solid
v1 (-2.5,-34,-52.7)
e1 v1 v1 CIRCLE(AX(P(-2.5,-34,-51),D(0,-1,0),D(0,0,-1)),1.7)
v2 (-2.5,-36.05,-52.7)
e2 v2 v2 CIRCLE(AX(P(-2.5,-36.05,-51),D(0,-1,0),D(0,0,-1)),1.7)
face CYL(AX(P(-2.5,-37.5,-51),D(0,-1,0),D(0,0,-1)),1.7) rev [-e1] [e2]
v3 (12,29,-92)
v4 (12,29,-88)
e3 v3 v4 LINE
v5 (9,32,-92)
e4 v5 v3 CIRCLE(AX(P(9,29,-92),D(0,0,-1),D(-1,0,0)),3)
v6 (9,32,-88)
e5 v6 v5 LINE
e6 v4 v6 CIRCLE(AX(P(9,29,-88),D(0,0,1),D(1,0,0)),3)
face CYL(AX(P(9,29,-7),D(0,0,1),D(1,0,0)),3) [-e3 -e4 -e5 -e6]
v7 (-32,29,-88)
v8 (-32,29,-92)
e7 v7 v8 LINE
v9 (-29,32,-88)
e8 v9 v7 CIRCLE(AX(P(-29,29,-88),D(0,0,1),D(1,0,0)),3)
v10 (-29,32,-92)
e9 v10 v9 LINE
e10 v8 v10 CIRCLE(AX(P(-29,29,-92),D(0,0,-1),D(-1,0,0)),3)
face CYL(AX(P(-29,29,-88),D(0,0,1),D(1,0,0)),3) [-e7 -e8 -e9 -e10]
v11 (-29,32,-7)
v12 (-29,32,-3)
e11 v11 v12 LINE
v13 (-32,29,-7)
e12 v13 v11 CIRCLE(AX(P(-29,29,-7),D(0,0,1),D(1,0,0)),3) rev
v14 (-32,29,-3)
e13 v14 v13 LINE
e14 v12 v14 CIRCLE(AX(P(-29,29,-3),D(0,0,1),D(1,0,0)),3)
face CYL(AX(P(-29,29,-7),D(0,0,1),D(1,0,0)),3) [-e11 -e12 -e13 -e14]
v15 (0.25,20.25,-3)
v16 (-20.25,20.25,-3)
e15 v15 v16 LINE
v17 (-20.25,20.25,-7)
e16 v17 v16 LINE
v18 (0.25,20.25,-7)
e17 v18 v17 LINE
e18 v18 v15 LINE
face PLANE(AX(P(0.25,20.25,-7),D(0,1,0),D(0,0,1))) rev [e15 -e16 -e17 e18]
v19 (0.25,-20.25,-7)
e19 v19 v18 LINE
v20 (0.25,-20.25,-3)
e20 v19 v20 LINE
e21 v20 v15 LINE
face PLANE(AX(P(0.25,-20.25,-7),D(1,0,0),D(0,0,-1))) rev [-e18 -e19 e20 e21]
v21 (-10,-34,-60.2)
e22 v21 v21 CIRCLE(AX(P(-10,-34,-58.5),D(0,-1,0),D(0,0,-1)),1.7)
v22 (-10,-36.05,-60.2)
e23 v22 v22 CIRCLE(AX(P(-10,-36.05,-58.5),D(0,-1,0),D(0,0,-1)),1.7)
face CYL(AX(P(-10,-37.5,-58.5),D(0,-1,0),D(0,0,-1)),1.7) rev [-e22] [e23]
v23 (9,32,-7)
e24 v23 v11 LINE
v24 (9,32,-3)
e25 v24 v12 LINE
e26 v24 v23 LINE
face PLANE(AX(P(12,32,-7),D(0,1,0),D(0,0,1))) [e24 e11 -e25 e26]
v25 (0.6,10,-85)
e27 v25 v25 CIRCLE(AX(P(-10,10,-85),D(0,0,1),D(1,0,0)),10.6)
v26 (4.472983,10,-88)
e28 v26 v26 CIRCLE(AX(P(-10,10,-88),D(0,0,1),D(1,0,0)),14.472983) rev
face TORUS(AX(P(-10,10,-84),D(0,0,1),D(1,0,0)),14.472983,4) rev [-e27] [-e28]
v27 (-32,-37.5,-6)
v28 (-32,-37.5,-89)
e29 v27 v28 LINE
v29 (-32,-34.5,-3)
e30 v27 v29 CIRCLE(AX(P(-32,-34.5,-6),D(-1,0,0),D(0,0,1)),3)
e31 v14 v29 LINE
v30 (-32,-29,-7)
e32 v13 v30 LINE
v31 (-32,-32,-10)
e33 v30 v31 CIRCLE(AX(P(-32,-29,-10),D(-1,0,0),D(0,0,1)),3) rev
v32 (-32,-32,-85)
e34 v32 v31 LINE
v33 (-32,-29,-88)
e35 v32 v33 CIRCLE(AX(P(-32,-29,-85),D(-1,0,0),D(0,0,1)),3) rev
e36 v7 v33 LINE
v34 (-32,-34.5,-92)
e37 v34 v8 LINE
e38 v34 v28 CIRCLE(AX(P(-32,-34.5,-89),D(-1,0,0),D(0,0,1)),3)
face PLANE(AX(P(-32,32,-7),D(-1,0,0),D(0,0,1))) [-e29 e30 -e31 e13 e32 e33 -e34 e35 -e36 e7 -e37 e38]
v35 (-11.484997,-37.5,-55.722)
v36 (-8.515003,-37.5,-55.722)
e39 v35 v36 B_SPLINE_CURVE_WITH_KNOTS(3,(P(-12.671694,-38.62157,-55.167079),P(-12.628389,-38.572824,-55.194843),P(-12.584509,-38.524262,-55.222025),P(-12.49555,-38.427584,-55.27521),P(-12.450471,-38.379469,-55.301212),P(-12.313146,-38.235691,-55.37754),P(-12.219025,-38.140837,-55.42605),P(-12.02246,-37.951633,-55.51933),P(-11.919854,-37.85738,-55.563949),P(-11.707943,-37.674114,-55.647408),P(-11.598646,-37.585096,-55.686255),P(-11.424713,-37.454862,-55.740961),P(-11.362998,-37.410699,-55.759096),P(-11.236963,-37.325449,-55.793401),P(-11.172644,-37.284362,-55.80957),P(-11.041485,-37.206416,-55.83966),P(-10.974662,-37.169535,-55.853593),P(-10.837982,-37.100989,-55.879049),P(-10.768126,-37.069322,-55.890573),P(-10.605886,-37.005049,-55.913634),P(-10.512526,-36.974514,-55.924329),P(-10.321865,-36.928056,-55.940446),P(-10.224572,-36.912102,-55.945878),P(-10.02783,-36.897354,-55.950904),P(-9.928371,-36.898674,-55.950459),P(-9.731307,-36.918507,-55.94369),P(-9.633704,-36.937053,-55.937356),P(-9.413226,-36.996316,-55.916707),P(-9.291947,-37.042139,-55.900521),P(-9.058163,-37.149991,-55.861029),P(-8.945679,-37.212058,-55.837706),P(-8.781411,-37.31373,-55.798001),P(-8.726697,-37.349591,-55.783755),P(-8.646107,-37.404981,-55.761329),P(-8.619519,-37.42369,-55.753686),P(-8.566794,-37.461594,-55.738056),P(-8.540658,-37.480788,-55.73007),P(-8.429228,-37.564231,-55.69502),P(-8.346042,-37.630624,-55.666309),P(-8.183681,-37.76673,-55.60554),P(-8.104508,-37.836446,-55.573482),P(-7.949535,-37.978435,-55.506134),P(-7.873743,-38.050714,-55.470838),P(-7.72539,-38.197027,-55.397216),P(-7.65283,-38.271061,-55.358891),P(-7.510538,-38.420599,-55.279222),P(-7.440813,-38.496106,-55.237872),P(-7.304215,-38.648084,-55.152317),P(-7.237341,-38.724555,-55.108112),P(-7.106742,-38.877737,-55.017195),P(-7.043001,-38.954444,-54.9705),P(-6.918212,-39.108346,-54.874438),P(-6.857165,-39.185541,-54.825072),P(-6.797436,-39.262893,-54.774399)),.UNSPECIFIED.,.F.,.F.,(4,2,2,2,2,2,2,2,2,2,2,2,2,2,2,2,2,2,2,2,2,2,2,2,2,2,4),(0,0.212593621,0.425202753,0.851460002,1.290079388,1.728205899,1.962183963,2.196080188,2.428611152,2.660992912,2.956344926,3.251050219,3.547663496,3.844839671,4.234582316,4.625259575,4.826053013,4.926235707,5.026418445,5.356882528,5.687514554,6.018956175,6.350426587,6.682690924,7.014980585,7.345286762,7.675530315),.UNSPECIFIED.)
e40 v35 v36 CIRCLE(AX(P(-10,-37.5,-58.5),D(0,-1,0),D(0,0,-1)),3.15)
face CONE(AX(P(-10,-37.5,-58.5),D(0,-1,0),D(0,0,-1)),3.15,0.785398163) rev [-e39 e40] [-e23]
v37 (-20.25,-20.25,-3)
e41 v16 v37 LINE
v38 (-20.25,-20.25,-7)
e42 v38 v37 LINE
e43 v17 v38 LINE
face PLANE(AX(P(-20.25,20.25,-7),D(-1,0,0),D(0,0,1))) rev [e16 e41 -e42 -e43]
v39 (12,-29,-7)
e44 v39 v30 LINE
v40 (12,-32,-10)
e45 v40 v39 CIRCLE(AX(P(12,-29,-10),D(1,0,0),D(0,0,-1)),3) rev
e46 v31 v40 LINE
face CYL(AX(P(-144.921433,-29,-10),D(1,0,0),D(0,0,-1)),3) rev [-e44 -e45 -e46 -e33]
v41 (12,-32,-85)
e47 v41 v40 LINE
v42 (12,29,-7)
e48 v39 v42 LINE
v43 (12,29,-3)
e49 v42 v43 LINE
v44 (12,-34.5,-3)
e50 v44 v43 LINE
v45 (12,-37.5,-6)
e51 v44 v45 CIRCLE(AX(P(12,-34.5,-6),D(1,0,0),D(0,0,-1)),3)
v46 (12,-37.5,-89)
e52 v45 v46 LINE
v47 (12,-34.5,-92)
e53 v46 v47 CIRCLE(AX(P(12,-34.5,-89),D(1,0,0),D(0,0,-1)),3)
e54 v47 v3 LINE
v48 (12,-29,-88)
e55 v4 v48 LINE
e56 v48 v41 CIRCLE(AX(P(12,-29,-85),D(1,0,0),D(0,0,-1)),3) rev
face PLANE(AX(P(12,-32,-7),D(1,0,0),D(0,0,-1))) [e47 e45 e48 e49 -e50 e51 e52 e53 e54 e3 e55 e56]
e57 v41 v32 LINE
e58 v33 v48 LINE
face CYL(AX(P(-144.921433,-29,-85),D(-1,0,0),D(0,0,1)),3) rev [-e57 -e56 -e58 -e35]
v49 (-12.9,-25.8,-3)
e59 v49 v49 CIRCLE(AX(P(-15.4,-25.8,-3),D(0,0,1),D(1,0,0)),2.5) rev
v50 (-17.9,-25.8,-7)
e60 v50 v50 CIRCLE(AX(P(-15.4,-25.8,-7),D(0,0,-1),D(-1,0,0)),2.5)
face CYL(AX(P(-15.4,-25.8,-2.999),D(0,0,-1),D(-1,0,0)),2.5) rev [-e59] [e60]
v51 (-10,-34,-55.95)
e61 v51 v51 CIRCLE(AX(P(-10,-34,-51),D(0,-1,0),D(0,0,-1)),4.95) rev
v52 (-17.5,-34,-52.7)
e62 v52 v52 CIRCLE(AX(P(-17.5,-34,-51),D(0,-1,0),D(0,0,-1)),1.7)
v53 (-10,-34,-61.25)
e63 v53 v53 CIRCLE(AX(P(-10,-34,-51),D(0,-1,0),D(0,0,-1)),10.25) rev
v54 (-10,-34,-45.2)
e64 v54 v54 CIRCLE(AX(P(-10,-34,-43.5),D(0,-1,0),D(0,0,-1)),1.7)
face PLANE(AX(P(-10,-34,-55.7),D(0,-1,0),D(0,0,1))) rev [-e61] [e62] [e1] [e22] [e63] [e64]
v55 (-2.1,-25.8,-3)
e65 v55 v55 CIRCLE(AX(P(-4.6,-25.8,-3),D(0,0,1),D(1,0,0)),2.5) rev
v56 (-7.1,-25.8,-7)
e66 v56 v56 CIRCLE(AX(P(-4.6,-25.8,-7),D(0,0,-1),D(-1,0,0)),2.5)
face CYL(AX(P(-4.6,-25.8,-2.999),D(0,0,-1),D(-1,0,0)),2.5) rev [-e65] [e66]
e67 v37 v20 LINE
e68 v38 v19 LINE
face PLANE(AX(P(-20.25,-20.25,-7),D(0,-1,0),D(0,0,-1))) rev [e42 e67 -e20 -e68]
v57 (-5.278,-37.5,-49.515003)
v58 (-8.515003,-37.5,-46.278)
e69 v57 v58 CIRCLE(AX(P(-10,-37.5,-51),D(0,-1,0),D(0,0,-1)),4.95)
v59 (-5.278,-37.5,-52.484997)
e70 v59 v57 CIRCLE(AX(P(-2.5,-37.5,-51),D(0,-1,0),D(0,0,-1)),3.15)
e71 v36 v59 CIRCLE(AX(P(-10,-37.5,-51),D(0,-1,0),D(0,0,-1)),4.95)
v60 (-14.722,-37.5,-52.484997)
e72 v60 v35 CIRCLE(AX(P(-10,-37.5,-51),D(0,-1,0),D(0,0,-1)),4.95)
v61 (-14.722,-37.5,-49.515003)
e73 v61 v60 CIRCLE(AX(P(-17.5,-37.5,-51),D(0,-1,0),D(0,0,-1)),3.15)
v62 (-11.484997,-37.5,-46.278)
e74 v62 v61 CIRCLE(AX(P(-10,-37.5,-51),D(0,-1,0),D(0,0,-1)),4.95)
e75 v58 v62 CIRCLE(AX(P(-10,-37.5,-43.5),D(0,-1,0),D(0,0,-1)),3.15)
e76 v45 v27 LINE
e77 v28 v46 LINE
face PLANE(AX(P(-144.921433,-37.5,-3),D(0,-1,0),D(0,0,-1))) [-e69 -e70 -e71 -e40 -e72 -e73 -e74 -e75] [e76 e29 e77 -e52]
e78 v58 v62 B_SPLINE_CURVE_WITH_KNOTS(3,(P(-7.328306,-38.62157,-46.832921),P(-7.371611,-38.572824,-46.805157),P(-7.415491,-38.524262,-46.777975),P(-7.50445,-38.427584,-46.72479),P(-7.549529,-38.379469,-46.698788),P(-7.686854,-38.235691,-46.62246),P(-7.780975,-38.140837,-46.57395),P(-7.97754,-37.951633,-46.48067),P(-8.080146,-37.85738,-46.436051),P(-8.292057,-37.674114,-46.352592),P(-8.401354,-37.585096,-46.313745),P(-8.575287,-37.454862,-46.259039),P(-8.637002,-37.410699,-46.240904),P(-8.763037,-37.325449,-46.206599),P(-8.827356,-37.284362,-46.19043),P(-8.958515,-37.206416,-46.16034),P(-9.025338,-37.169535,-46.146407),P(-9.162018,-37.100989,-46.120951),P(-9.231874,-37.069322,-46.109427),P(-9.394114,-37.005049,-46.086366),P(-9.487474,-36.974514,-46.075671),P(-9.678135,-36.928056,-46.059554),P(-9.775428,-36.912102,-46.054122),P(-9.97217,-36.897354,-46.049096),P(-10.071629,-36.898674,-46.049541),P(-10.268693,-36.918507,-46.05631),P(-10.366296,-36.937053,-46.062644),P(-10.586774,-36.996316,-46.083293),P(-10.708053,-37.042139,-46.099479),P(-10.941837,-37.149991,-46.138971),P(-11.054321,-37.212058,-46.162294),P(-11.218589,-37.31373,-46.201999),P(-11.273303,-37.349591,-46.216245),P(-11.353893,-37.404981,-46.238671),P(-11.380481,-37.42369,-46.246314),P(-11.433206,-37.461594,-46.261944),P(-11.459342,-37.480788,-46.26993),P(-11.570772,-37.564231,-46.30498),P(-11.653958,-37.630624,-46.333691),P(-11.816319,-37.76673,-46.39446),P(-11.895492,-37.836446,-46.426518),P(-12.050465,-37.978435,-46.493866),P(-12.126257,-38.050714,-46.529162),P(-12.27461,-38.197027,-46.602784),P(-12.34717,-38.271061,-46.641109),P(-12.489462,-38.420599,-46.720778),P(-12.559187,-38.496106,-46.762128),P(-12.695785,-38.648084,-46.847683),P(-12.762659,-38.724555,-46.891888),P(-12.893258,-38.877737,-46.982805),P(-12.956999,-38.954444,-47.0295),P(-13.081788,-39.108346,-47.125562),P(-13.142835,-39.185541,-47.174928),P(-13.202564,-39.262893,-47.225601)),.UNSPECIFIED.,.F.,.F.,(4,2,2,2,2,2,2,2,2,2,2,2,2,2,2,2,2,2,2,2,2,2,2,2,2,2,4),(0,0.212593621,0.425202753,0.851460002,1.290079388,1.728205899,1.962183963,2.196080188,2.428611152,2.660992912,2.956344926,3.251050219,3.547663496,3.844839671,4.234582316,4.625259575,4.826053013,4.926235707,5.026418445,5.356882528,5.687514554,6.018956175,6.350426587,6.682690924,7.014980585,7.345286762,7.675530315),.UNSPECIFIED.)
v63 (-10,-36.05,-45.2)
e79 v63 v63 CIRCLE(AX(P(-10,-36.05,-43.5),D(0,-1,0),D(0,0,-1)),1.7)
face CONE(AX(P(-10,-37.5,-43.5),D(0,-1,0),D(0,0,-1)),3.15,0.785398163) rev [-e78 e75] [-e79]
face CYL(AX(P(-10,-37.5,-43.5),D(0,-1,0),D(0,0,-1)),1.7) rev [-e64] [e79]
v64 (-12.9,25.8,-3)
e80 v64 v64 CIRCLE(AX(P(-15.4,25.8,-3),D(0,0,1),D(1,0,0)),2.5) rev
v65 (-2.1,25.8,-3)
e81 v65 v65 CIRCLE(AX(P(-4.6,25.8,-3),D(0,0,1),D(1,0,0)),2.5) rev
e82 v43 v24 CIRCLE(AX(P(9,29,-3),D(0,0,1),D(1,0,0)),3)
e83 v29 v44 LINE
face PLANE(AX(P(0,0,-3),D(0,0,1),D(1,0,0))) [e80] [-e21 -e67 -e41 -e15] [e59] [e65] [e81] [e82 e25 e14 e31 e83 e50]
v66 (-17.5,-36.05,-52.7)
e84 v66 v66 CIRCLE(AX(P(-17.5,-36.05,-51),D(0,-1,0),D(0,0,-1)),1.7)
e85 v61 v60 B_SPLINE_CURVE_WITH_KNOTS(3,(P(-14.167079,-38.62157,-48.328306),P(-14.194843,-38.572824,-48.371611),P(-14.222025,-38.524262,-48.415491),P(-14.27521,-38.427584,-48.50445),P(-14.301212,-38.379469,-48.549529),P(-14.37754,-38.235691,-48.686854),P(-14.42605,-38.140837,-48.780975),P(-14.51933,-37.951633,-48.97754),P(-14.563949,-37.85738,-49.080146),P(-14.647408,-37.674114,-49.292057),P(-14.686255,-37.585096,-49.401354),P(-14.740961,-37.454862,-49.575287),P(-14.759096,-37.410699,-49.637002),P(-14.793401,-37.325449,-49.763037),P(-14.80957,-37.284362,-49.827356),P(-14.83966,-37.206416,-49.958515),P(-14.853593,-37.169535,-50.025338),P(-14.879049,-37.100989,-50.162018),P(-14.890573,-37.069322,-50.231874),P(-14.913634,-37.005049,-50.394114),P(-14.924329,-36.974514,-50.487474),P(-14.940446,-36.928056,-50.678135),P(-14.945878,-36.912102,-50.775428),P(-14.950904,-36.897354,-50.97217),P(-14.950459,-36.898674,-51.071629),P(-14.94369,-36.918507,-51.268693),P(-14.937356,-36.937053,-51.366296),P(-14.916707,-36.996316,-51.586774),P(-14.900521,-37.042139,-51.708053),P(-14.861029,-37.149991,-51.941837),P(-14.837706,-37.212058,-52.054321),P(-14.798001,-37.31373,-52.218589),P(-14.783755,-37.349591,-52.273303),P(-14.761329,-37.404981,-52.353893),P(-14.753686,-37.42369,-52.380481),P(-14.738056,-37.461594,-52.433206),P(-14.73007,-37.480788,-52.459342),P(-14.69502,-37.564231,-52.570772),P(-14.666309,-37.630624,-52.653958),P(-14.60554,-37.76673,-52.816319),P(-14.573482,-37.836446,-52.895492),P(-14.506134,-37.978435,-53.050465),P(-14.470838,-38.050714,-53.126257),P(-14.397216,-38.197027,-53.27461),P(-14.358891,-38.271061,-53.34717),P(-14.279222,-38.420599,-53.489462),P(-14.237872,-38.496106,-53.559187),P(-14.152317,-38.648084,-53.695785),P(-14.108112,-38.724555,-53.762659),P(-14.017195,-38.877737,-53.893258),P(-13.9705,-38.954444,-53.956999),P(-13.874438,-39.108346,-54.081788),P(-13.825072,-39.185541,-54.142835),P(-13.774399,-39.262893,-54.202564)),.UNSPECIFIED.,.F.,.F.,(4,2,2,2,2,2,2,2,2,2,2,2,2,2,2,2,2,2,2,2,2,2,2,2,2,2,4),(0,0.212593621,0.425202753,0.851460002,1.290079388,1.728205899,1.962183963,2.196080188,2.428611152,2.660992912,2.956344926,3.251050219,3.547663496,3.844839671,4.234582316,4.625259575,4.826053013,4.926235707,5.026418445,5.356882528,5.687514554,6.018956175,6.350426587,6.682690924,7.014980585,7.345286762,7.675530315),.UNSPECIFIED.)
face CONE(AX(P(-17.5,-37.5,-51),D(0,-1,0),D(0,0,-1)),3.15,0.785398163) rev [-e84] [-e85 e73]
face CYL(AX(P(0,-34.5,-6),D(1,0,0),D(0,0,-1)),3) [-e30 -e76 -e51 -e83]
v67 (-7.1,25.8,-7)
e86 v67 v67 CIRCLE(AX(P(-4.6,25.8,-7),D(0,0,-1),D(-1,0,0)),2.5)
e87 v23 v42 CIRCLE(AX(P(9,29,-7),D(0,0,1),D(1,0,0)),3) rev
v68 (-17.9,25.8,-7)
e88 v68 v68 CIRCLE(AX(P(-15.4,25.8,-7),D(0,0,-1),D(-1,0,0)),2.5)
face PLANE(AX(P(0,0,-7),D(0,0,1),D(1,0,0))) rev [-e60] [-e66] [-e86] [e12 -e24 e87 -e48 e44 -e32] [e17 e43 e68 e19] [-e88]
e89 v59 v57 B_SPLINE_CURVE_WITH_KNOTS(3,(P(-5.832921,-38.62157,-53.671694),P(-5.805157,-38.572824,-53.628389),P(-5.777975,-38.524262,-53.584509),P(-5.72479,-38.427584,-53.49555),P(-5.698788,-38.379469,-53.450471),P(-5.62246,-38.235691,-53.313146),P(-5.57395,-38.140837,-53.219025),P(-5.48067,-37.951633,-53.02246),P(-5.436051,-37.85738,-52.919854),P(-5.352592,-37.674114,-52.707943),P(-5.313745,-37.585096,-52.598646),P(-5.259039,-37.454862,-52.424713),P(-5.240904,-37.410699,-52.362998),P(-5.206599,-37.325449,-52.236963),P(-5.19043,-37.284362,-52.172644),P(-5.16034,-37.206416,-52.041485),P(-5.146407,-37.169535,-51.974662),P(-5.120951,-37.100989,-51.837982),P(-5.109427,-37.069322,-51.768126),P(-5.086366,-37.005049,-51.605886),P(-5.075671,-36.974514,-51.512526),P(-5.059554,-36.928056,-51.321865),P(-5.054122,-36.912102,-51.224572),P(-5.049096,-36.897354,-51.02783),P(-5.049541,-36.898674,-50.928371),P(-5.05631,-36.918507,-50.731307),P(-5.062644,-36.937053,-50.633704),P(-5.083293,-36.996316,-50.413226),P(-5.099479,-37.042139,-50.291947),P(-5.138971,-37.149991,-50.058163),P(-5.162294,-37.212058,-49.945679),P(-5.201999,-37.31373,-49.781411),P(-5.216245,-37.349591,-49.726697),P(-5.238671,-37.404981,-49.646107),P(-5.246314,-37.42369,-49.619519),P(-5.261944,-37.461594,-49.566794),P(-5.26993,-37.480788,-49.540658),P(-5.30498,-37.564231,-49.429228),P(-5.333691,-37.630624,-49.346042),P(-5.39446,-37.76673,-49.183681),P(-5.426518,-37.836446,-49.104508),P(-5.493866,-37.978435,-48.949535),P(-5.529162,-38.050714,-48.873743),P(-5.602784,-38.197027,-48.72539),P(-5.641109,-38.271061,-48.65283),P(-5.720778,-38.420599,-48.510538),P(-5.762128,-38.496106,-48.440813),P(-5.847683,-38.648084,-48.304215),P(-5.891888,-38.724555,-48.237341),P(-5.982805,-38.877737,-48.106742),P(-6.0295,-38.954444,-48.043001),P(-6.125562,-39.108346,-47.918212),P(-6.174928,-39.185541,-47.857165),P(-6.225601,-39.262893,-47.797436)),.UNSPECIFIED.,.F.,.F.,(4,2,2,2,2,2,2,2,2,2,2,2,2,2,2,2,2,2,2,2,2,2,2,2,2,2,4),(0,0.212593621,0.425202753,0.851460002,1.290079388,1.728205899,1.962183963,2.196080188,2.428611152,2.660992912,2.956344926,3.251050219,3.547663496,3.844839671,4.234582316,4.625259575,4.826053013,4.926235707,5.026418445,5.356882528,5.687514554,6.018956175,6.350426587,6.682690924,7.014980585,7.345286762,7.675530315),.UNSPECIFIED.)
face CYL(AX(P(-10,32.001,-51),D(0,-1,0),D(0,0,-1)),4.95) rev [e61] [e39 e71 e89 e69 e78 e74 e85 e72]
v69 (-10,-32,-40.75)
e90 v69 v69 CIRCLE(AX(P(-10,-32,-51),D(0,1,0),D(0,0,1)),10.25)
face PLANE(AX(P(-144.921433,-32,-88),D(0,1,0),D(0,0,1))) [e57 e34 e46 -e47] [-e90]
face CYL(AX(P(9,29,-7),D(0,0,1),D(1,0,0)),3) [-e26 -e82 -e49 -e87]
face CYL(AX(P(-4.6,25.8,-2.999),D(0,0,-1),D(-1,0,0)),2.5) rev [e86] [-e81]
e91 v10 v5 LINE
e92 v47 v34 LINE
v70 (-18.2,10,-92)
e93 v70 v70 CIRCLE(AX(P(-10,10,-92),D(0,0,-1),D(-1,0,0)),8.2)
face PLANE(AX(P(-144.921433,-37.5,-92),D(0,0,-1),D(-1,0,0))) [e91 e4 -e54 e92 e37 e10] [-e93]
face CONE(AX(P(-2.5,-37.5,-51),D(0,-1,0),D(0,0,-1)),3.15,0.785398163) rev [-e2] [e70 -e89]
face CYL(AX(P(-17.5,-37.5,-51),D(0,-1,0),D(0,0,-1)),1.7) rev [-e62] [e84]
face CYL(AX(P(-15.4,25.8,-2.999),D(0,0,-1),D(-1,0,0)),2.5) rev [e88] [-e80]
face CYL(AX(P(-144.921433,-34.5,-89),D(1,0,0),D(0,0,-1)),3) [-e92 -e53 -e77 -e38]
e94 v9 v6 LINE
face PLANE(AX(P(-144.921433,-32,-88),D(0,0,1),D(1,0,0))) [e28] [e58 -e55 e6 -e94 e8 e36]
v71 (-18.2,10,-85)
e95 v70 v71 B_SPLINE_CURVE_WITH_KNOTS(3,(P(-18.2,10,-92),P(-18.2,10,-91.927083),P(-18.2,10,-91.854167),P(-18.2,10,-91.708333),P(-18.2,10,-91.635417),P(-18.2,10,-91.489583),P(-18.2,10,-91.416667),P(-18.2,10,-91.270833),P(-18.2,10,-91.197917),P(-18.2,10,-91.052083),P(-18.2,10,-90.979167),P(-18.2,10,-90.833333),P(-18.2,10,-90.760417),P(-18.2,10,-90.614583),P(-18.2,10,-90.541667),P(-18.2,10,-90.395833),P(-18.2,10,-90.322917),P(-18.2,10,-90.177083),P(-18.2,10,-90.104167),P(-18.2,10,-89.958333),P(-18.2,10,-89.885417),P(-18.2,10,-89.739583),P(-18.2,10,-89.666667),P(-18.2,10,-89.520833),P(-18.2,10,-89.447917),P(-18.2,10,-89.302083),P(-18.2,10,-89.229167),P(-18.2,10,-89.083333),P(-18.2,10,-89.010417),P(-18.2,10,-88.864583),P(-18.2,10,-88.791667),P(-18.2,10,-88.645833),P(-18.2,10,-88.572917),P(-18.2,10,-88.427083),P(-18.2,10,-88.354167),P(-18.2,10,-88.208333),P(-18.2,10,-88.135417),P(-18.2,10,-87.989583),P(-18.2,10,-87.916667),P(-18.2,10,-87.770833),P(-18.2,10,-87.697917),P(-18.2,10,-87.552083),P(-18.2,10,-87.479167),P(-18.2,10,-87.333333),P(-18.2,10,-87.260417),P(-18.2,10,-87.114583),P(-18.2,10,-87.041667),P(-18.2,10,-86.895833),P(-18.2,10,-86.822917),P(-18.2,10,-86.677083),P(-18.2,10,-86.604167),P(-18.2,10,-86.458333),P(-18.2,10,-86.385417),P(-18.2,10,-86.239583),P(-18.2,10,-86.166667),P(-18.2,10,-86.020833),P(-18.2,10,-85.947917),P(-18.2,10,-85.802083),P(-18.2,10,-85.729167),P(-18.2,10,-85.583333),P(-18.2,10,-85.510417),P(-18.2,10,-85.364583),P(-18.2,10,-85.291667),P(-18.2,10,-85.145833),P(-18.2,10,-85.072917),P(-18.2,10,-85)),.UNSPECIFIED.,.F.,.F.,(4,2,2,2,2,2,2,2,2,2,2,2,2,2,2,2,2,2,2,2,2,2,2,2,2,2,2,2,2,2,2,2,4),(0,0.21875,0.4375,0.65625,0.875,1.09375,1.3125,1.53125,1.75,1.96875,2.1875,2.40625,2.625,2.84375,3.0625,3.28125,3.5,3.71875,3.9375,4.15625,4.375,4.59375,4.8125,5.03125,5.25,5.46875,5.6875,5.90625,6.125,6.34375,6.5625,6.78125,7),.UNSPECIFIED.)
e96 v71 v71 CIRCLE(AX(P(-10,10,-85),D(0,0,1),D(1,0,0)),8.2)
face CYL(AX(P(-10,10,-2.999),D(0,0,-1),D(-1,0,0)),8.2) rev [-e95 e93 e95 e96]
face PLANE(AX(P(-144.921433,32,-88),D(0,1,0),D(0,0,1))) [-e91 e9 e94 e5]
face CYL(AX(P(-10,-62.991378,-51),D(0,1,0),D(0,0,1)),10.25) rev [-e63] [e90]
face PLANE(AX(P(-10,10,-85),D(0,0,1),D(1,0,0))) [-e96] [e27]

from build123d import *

# Parameters (mm, degrees)
BOSS_EXTRU_1_START                             = -3
ESQUISSE1_W                                    = 44
ESQUISSE1_H                                    = 64
ESQUISSE1_W_2                                  = 20.5
ESQUISSE1_H_2                                  = 40.5
BOSS_EXTRU_1_DEPTH                             = 4
BOSS_EXTRU_2_DEPTH                             = 44
ENL_V_MAT_EXTRU_1_REACH                        = 103.741
ESQUISSE3_R                                    = 8.2
ESQUISSE4_R                                    = 10.6
ESQUISSE4_R_2                                  = 8.2
BOSS_EXTRU_3_DEPTH                             = 3
CONG_1_R                                       = 4
CONG_2_R                                       = 3
ENL_V_MAT_EXTRU_2_REACH                        = 100.261
ESQUISSE5_R                                    = 2.5
ENL_V_START                                    = -2
ESQUISSE6_R                                    = 10.25
ENL_V_MAT_EXTRU_3_DEPTH                        = 2
ENL_V_MAT_EXTRU_4_REACH                        = 121.659
ESQUISSE7_R                                    = 4.95
FRAISAGE_POUR_VIS_T_TE_FRAIS_E_M31_D           = 3.4
FRAISAGE_POUR_VIS_T_TE_FRAIS_E_M31_CSINK_D     = 6.3
FRAISAGE_POUR_VIS_T_TE_FRAIS_E_M31_CSINK_ANGLE = 90


with BuildPart() as part:
    # Esquisse1 → Boss.-Extru.1 (new body)
    with BuildSketch(Plane.XY.offset(BOSS_EXTRU_1_START)):
        with Locations((-10, 0)):
            Rectangle(ESQUISSE1_W, ESQUISSE1_H)
        with Locations((-10, 0)):
            Rectangle(ESQUISSE1_W_2, ESQUISSE1_H_2, mode=Mode.SUBTRACT)
    extrude(amount=-BOSS_EXTRU_1_DEPTH)

    # Esquisse2 → Boss.-Extru.2 (add)
    with BuildSketch(Plane(origin=(12, 0, 0), x_dir=(0, 0, -1), z_dir=(1, 0, 0))):
        Polygon((3, -37.5), (92, -37.5), (92, 32), (88, 32), (88, -32), (7, -32), (7, -28.443383769), (3, -28.443383769), (3, -32), align=None)
    extrude(amount=-BOSS_EXTRU_2_DEPTH)

    # Esquisse3 → Enlèv. mat.-Extru.1 (cut, up to next)
    with BuildSketch(Plane(origin=(0, 0, -92), x_dir=(-1, 0, 0), z_dir=(0, 0, -1)), mode=Mode.PRIVATE) as enl_v_mat_extru_1_sk1:
        with Locations((10, 10)):
            Circle(ESQUISSE3_R)
    enl_v_mat_extru_1_tool1 = extrude(enl_v_mat_extru_1_sk1.sketch, amount=-ENL_V_MAT_EXTRU_1_REACH, mode=Mode.PRIVATE) & part.part
    add(enl_v_mat_extru_1_tool1.solids().sort_by_distance((-10, 10, -92))[0], mode=Mode.SUBTRACT)

    # Esquisse4 → Boss.-Extru.3 (add)
    with BuildSketch(Plane.XY.offset(-88)):
        with Locations((-10, 10)):
            Circle(ESQUISSE4_R)
        with Locations(Location((-10, 10, 0), (0, 0, 180))):
            Circle(ESQUISSE4_R_2, mode=Mode.SUBTRACT)
    extrude(amount=BOSS_EXTRU_3_DEPTH)

    # Congé1
    # the kernel refuses this fillet: 4 mm, written as the material it adds along each edge
    with BuildSketch(Plane(origin=(-10, 10, -88), x_dir=(1, 0, 0), z_dir=(0, -1, 0))) as cong_1_piece_1:
        with BuildLine():
            CenterArc((14.472983346, 4), CONG_1_R, 194.477512186, 75.522487814)
            Line((10.6, 3), (10.522540333, 2.98))
            ThreePointArc((10.522540333, 2.98), (10.52, 1.5), (10.52, 0))
            Line((10.52, 0), (10.6, -0.08))
            Line((10.6, -0.08), (14.472983346, -0.08))
            Line((14.472983346, -0.08), (14.472983346, 0))
        make_face()
    revolve(axis=Axis((-10, 10, -88), (0, 0, 1)))

    # Congé2
    cong_2_edges = [part.edges().sort_by_distance(p)[0] for p in [
        (12, 32, -90),
        (-32, 32, -90),
        (-10, -32, -88),
        (-10, -37.5, -3),
        (-10, -37.5, -92),
        (-10, -32, -7),
        (-32, 32, -5),
        (12, 32, -5),
    ]]
    fillet(cong_2_edges, radius=CONG_2_R)

    # Esquisse5 → Enlèv. mat.-Extru.2 (cut, up to next)
    with BuildSketch(Plane(origin=(0, 0, -7), x_dir=(-1, 0, 0), z_dir=(0, 0, -1)), mode=Mode.PRIVATE) as enl_v_mat_extru_2_sk1:
        with Locations((4.6, 25.8)):
            Circle(ESQUISSE5_R)
    enl_v_mat_extru_2_tool1 = extrude(enl_v_mat_extru_2_sk1.sketch, amount=-ENL_V_MAT_EXTRU_2_REACH, mode=Mode.PRIVATE) & part.part
    # Esquisse5 → Enlèv. mat.-Extru.2 (cut, up to next)
    with BuildSketch(Plane(origin=(0, 0, -7), x_dir=(-1, 0, 0), z_dir=(0, 0, -1)), mode=Mode.PRIVATE) as enl_v_mat_extru_2_sk2:
        with Locations((15.4, 25.8)):
            Circle(ESQUISSE5_R)
    enl_v_mat_extru_2_tool2 = extrude(enl_v_mat_extru_2_sk2.sketch, amount=-ENL_V_MAT_EXTRU_2_REACH, mode=Mode.PRIVATE) & part.part
    # Esquisse5 → Enlèv. mat.-Extru.2 (cut, up to next)
    with BuildSketch(Plane(origin=(0, 0, -7), x_dir=(-1, 0, 0), z_dir=(0, 0, -1)), mode=Mode.PRIVATE) as enl_v_mat_extru_2_sk3:
        with Locations((4.6, -25.8)):
            Circle(ESQUISSE5_R)
    enl_v_mat_extru_2_tool3 = extrude(enl_v_mat_extru_2_sk3.sketch, amount=-ENL_V_MAT_EXTRU_2_REACH, mode=Mode.PRIVATE) & part.part
    # Esquisse5 → Enlèv. mat.-Extru.2 (cut, up to next)
    with BuildSketch(Plane(origin=(0, 0, -7), x_dir=(-1, 0, 0), z_dir=(0, 0, -1)), mode=Mode.PRIVATE) as enl_v_mat_extru_2_sk4:
        with Locations((15.4, -25.8)):
            Circle(ESQUISSE5_R)
    enl_v_mat_extru_2_tool4 = extrude(enl_v_mat_extru_2_sk4.sketch, amount=-ENL_V_MAT_EXTRU_2_REACH, mode=Mode.PRIVATE) & part.part
    add(enl_v_mat_extru_2_tool1.solids().sort_by_distance((-4.6, 25.8, -7))[0], mode=Mode.SUBTRACT)
    add(enl_v_mat_extru_2_tool2.solids().sort_by_distance((-15.4, 25.8, -7))[0], mode=Mode.SUBTRACT)
    add(enl_v_mat_extru_2_tool3.solids().sort_by_distance((-4.6, -25.8, -7))[0], mode=Mode.SUBTRACT)
    add(enl_v_mat_extru_2_tool4.solids().sort_by_distance((-15.4, -25.8, -7))[0], mode=Mode.SUBTRACT)

    # Esquisse6 → Enlèv. mat.-Extru.3 (cut)
    with BuildSketch(Plane(origin=(0, -32, 0), x_dir=(1, 0, 0), z_dir=(0, 1, 0)).offset(ENL_V_START)):
        with Locations(Location((-10, 51, 0), (0, 0, 270))):
            Circle(ESQUISSE6_R)
    extrude(amount=ENL_V_MAT_EXTRU_3_DEPTH, mode=Mode.SUBTRACT)

    # Esquisse7 → Enlèv. mat.-Extru.4 (cut, up to next)
    with BuildSketch(Plane.XZ.offset(37.5), mode=Mode.PRIVATE) as enl_v_mat_extru_4_sk1:
        with Locations(Location((-10, -51, 0), (0, 0, 270))):
            Circle(ESQUISSE7_R)
    enl_v_mat_extru_4_tool1 = extrude(enl_v_mat_extru_4_sk1.sketch, amount=-ENL_V_MAT_EXTRU_4_REACH, mode=Mode.PRIVATE) & part.part
    add(enl_v_mat_extru_4_tool1.solids().sort_by_distance((-10, -37.5, -51))[0], mode=Mode.SUBTRACT)

    # Fraisage pour vis à tête fraisée M31 (through all)
    with Locations(Plane(origin=(0, -37.5, 0), x_dir=(-1, 0, 0), z_dir=(0, -1, 0))):
        with Locations((10, 58.5), (17.5, 51), (10, 43.5), (2.5, 51)):
            CounterSinkHole(FRAISAGE_POUR_VIS_T_TE_FRAIS_E_M31_D / 2, FRAISAGE_POUR_VIS_T_TE_FRAIS_E_M31_CSINK_D / 2, counter_sink_angle=FRAISAGE_POUR_VIS_T_TE_FRAIS_E_M31_CSINK_ANGLE)


solid = part.part
